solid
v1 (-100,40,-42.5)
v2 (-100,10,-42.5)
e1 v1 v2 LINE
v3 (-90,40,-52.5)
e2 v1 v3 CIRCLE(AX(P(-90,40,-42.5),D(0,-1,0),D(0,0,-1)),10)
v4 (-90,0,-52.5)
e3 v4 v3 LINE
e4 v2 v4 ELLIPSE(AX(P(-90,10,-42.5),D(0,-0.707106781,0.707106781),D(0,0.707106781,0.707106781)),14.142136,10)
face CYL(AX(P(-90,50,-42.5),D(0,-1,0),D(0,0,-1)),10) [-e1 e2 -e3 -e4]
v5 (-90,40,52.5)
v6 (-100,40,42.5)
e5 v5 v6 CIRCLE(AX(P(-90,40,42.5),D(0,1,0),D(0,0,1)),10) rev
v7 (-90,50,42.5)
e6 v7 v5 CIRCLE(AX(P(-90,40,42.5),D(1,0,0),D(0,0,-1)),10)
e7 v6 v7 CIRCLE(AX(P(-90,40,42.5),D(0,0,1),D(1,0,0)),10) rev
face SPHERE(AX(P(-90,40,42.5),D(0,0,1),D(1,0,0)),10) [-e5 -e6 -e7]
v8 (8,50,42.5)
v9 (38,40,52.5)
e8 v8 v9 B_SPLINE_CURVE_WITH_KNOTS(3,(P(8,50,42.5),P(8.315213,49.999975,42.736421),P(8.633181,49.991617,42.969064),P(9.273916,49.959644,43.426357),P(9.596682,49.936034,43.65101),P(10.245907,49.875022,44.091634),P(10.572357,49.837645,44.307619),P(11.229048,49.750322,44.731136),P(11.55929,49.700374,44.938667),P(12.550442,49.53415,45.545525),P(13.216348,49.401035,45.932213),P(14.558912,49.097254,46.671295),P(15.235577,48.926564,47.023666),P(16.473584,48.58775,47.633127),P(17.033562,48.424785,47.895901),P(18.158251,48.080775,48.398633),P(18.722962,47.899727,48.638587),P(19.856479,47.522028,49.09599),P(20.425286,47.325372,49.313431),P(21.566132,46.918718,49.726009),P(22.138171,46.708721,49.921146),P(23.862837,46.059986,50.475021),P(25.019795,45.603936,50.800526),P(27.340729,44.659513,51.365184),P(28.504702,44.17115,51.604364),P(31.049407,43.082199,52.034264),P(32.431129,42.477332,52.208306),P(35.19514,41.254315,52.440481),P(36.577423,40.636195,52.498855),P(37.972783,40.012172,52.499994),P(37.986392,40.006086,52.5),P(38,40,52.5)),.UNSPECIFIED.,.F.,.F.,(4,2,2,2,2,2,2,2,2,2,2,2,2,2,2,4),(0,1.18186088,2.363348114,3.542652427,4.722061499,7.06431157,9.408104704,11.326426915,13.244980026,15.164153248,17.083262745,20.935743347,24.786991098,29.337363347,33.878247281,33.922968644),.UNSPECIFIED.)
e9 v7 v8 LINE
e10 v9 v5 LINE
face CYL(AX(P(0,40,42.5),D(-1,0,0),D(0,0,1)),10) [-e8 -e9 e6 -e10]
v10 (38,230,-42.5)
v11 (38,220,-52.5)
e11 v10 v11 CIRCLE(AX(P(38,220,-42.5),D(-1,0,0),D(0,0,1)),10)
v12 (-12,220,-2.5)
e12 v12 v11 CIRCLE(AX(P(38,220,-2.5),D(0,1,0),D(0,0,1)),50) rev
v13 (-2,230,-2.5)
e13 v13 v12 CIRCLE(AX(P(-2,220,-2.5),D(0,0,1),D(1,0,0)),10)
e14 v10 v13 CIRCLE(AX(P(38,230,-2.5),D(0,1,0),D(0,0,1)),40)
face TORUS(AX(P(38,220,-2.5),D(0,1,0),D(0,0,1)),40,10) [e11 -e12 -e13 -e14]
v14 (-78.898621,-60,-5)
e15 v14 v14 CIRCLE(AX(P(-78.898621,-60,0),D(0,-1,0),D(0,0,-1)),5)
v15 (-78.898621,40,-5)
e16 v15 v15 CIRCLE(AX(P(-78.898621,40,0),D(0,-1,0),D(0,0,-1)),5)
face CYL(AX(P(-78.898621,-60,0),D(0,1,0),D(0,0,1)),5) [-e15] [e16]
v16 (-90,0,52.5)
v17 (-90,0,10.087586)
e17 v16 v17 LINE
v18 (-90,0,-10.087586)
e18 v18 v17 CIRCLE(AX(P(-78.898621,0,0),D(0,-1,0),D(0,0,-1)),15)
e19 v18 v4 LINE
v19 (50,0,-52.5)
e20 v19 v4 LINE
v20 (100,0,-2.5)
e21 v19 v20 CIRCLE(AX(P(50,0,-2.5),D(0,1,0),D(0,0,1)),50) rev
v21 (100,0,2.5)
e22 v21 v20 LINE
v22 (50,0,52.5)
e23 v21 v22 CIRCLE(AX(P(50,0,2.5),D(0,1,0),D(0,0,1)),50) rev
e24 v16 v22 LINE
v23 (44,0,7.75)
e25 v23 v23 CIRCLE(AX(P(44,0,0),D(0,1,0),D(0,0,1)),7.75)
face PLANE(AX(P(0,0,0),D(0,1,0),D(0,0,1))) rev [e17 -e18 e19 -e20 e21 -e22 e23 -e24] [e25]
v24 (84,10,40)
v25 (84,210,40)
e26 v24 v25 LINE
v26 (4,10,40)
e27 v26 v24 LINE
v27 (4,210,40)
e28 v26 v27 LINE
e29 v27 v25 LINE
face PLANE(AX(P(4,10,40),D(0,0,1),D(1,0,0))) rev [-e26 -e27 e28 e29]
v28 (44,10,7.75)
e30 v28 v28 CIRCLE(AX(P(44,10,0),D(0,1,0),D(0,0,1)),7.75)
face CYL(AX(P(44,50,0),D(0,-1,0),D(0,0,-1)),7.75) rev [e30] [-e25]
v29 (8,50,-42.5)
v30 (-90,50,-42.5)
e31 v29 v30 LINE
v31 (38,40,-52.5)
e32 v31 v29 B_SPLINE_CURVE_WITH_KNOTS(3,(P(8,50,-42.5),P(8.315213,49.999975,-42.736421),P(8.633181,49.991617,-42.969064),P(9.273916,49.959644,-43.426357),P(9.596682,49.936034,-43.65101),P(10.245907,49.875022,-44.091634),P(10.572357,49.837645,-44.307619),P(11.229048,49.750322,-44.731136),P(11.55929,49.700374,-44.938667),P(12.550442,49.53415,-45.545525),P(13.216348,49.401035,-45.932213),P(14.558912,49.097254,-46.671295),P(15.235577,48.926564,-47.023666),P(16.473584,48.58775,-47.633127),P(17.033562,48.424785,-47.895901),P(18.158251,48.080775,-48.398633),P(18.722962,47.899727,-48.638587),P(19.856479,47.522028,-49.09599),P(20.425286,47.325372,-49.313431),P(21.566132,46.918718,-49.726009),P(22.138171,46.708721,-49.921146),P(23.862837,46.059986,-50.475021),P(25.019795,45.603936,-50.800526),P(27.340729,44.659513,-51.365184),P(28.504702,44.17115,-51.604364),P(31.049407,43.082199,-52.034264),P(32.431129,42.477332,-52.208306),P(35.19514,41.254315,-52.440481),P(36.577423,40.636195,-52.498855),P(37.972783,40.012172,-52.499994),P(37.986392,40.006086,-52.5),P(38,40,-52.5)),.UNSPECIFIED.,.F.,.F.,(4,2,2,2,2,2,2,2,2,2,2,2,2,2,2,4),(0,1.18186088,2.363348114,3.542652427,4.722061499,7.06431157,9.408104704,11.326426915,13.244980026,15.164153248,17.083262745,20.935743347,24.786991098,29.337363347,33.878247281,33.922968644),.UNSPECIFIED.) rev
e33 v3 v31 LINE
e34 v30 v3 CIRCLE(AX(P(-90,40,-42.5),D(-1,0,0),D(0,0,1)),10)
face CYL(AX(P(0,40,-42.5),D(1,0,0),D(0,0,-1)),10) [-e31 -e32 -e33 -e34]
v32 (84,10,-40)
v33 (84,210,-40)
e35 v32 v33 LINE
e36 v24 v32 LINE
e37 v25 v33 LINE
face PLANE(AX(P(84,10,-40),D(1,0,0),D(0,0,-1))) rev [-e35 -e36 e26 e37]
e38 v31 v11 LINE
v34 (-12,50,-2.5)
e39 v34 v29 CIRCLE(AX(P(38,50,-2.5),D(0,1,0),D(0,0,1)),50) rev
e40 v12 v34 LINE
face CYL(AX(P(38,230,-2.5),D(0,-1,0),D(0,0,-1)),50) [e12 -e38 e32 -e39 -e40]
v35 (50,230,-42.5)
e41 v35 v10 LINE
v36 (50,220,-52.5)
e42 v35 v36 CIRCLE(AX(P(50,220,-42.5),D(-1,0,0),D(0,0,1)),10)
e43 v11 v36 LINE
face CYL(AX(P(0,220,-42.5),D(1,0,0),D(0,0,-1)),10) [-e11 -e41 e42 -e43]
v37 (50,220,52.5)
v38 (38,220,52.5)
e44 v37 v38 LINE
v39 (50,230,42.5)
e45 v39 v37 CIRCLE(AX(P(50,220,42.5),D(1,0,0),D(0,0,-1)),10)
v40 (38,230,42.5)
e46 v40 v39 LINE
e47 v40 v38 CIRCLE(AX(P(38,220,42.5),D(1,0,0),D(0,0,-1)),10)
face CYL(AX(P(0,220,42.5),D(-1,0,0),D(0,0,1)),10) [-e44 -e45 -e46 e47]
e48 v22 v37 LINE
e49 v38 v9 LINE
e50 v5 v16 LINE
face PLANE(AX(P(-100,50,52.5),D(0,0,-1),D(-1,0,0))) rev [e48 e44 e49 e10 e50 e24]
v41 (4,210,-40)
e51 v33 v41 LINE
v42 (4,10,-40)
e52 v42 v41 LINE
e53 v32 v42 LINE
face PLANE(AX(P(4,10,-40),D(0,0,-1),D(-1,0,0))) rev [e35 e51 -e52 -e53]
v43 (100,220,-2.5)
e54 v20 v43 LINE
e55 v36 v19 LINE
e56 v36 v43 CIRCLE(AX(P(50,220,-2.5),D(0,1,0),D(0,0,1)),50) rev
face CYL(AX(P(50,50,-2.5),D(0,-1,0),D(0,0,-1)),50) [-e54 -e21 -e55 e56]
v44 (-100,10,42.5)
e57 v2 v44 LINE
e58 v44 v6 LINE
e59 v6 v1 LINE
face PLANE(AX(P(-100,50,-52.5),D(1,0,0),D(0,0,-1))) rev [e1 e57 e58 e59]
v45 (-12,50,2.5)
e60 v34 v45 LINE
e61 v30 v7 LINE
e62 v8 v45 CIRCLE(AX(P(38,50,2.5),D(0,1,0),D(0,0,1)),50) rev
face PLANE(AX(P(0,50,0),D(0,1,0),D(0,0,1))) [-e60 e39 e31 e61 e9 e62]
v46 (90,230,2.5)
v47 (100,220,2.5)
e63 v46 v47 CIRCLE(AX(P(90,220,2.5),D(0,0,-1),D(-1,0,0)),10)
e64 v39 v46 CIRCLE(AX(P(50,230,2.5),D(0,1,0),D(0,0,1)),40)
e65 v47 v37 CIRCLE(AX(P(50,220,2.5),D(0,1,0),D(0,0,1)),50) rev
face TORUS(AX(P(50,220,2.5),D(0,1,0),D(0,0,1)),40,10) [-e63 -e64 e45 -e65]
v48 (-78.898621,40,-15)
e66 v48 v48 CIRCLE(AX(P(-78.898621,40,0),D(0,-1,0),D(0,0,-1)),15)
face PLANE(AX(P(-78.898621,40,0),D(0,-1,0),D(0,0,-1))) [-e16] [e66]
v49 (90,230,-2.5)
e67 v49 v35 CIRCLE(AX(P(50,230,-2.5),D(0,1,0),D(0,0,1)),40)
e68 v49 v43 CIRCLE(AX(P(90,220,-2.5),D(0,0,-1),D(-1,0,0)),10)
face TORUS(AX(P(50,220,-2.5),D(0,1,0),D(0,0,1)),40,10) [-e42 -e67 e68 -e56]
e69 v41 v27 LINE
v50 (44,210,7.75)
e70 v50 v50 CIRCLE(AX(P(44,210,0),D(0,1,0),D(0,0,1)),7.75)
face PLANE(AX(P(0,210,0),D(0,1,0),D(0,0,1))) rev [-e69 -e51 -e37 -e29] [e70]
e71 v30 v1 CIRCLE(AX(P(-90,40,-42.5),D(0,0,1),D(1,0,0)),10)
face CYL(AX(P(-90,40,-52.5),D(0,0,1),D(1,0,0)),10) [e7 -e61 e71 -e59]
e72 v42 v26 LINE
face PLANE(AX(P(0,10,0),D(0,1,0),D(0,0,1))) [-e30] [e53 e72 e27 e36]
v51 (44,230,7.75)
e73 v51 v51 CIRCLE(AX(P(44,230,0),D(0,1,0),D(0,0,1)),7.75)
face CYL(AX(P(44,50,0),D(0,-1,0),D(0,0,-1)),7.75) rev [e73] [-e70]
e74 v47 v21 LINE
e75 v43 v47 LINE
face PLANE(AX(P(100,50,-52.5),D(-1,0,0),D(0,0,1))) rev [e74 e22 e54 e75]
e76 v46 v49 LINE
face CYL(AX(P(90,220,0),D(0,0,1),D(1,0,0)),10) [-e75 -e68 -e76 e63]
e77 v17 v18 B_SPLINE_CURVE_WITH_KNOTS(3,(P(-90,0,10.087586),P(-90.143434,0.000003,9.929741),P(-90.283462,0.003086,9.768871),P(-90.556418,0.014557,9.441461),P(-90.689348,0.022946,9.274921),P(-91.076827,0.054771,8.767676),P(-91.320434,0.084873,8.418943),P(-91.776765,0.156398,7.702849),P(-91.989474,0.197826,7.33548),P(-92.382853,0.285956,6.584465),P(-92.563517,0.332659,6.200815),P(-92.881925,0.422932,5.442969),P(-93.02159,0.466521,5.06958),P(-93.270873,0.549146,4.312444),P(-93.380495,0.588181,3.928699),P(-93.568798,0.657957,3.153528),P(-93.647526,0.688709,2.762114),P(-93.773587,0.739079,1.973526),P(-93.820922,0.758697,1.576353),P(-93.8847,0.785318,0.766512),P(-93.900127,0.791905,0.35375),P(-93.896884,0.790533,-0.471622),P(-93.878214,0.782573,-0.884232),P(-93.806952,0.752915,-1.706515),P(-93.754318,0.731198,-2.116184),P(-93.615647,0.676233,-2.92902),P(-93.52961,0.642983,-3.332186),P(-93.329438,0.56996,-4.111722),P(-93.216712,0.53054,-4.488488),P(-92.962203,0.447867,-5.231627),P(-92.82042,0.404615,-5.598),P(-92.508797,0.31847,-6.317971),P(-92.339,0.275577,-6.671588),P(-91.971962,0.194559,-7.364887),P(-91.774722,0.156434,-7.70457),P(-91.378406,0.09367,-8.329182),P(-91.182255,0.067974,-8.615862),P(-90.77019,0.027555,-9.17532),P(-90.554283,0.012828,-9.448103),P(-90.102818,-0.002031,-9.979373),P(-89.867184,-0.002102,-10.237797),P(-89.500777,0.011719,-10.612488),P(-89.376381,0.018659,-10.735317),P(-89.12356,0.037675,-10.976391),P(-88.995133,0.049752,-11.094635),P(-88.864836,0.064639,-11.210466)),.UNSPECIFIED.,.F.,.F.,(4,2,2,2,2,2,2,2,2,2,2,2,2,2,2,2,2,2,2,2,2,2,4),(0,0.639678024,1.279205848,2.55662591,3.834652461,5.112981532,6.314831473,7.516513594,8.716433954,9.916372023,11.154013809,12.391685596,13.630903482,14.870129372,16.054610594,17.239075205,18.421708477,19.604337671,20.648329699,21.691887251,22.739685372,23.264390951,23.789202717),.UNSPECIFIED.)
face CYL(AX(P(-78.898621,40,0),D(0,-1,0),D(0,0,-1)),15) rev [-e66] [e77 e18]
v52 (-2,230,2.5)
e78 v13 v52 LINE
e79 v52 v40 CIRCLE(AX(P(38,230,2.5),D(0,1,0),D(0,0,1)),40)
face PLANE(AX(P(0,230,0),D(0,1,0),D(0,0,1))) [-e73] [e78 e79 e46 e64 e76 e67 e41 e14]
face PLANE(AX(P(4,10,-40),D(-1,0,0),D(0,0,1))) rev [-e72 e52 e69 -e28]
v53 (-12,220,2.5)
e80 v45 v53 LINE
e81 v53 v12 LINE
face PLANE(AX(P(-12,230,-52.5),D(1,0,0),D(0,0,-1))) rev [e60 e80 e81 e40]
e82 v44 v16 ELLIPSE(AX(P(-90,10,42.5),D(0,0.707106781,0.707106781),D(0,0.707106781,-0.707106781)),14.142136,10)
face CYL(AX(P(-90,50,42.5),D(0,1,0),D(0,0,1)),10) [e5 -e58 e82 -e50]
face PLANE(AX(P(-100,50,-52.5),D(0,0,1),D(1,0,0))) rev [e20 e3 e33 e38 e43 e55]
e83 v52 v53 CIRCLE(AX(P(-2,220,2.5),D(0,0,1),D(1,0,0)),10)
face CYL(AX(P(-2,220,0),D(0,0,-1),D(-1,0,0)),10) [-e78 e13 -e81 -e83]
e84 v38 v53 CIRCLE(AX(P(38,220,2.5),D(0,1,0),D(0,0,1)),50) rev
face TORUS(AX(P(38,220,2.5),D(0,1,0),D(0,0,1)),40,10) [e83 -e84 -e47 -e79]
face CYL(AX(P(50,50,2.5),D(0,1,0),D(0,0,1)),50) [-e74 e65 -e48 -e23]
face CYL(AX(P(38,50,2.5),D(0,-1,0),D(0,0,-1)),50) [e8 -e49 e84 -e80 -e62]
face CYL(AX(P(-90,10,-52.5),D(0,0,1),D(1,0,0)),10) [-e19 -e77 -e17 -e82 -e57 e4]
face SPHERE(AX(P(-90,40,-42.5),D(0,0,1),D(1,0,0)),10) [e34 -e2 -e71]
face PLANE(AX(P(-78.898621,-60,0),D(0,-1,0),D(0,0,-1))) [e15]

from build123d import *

# Parameters (mm, degrees)
SKETCH2_W               = 200
SKETCH2_H               = 105
SKETCH2_R               = 7.75
BOSS_EXTRUDE2_DEPTH     = 50
SKETCH3_R               = 15
CUT_EXTRUDE1_DEPTH      = 40
SKETCH4_R               = 5
BOSS_EXTRUDE3_DEPTH     = 100
SKETCH5_W               = 112
SKETCH5_H               = 105
BOSS_EXTRUDE4_DEPTH     = 180
SKETCH7_R               = 7.75
CUT_EXTRUDE2_DEPTH      = 200
CUT_EXTRUDE3_DEPTH      = 160
CUT_EXTRUDE3_DEPTH_BACK = 40
SKETCH8_W               = 80
SKETCH8_H               = 80
FILLET6_R               = 10
FILLET7_R               = 10
FILLET8_R               = 10
FILLET9_R               = 50
FILLET10_R              = 50
FILLET11_R              = 50
FILLET12_R              = 50
FILLET14_R              = 10


with BuildPart() as part:
    # Sketch2 → Boss-Extrude2 (new body)
    with BuildSketch(Plane(origin=(0, 0, 0), x_dir=(1, 0, 0), z_dir=(0, 1, 0))):
        Rectangle(SKETCH2_W, SKETCH2_H)
        with Locations(Location((44, 0, 0), (0, 0, 270))):
            Circle(SKETCH2_R, mode=Mode.SUBTRACT)
    extrude(amount=BOSS_EXTRUDE2_DEPTH)

    # Sketch3 → Cut-Extrude1 (cut)
    with BuildSketch(Plane.XZ):
        with Locations(Location((-78.898621146, 0, 0), (0, 0, 270))):
            Circle(SKETCH3_R)
    extrude(amount=-CUT_EXTRUDE1_DEPTH, mode=Mode.SUBTRACT)

    # Sketch4 → Boss-Extrude3 (add)
    with BuildSketch(Plane.XZ.offset(-40)):
        with Locations(Location((-78.898621146, 0, 0), (0, 0, 270))):
            Circle(SKETCH4_R)
    extrude(amount=BOSS_EXTRUDE3_DEPTH)

    # Sketch5 → Boss-Extrude4 (add)
    with BuildSketch(Plane(origin=(0, 50, 0), x_dir=(1, 0, 0), z_dir=(0, 1, 0))):
        with Locations((44, 0)):
            Rectangle(SKETCH5_W, SKETCH5_H)
    extrude(amount=BOSS_EXTRUDE4_DEPTH)

    # Sketch7 → Cut-Extrude2 (cut)
    with BuildSketch(Plane.XZ.offset(-50)):
        with Locations(Location((44, 0, 0), (0, 0, 90))):
            Circle(SKETCH7_R)
    extrude(amount=-CUT_EXTRUDE2_DEPTH, mode=Mode.SUBTRACT)

    # Sketch8 → Cut-Extrude3 (cut, two sides: drawn at the far end of the back side and taken through both)
    with BuildSketch(Plane(origin=(0, 50, 0), x_dir=(1, 0, 0), z_dir=(0, 1, 0)).offset(-CUT_EXTRUDE3_DEPTH_BACK)):
        with Locations((44, 0)):
            Rectangle(SKETCH8_W, SKETCH8_H)
    extrude(amount=CUT_EXTRUDE3_DEPTH + CUT_EXTRUDE3_DEPTH_BACK, mode=Mode.SUBTRACT)

    # Fillet6
    # the kernel refuses this fillet: 10 mm, written as the material it takes off along each edge
    with BuildSketch(Plane(origin=(-100, 50, 77.5), x_dir=(0, -1, 0), z_dir=(0, 0, -1))) as fillet6_piece_1:
        with BuildLine():
            CenterArc((FILLET6_R, -FILLET6_R), FILLET6_R, 90, 90)
            Line((0, -FILLET6_R), (0, 0))
            Line((0, 0), (FILLET6_R, 0))
        make_face()
    extrude(amount=155, mode=Mode.SUBTRACT)
    with BuildSketch(Plane(origin=(-100, 0, 77.5), x_dir=(0, 1, 0), z_dir=(0, 0, -1))) as fillet6_piece_2:
        with BuildLine():
            CenterArc((FILLET6_R, FILLET6_R), FILLET6_R, 180, 90)
            Line((0, FILLET6_R), (0, 0))
            Line((0, 0), (FILLET6_R, 0))
        make_face()
    extrude(amount=155, mode=Mode.SUBTRACT)
    with BuildSketch(Plane(origin=(-100, -25, 52.5), x_dir=(0, 0, -1), z_dir=(0, 1, 0)), Plane(origin=(-100, -25, -52.5), x_dir=(1, 0, 0), z_dir=(0, 1, 0))) as fillet6_piece_3:
        with BuildLine():
            CenterArc((FILLET6_R, -FILLET6_R), FILLET6_R, 90, 90)
            Line((0, -FILLET6_R), (0, 0))
            Line((0, 0), (FILLET6_R, 0))
        make_face()
    extrude(amount=100, mode=Mode.SUBTRACT)

    # Fillet7
    # the kernel refuses this fillet: 10 mm, written as the material it takes off along each edge
    with BuildSketch(Plane(origin=(-90, 40, 42.5), x_dir=(0, 0, 1), z_dir=(0, 1, 0))) as fillet7_piece_1_section:
        Polygon((0, 0), (FILLET7_R, 0), (FILLET7_R, -FILLET7_R), (0, -FILLET7_R), align=None)
    fillet7_piece_1 = extrude(amount=FILLET7_R, mode=Mode.PRIVATE)
    fillet7_piece_1 = fillet7_piece_1 - Plane(origin=(-90, 40, 42.5), x_dir=(0.7071067811865477, 0, -0.7071067811865475), z_dir=(0, 1, 0)) * Sphere(FILLET7_R, mode=Mode.PRIVATE)
    add(fillet7_piece_1, mode=Mode.SUBTRACT)
    with BuildSketch(Plane(origin=(-12, 50, 52.5), x_dir=(0, 0, -1), z_dir=(-1, 0, 0))) as fillet7_piece_2:
        with BuildLine():
            CenterArc((FILLET7_R, FILLET7_R), FILLET7_R, 180, 90)
            Line((0, FILLET7_R), (0, 0))
            Line((0, 0), (FILLET7_R, 0))
        make_face()
    extrude(amount=78, mode=Mode.SUBTRACT)

    # Fillet8
    # the kernel refuses this fillet: 10 mm, written as the material it takes off along each edge
    with BuildSketch(Plane(origin=(-90, 40, -42.5), x_dir=(0, 1, 0), z_dir=(0, 0, -1))) as fillet8_piece_1_section:
        Polygon((0, 0), (FILLET8_R, 0), (FILLET8_R, -FILLET8_R), (0, -FILLET8_R), align=None)
    fillet8_piece_1 = extrude(amount=FILLET8_R, mode=Mode.PRIVATE)
    fillet8_piece_1 = fillet8_piece_1 - Plane(origin=(-90, 40, -42.5), x_dir=(0.7071067811865475, -0.7071067811865475, 0), z_dir=(0, 0, -1)) * Sphere(FILLET8_R, mode=Mode.PRIVATE)
    add(fillet8_piece_1, mode=Mode.SUBTRACT)
    with BuildSketch(Plane(origin=(-90, 50, -52.5), x_dir=(0, -1, 0), z_dir=(1, 0, 0))) as fillet8_piece_2:
        with BuildLine():
            CenterArc((FILLET8_R, -FILLET8_R), FILLET8_R, 90, 90)
            Line((0, -FILLET8_R), (0, 0))
            Line((0, 0), (FILLET8_R, 0))
        make_face()
    extrude(amount=78, mode=Mode.SUBTRACT)

    # Fillet9
    fillet9_edges = [part.edges().sort_by_distance(p)[0] for p in [
        (100, 115, 52.5),
    ]]
    fillet(fillet9_edges, radius=FILLET9_R)

    # Fillet10
    fillet10_edges = [part.edges().sort_by_distance(p)[0] for p in [
        (-12, 135, 52.5),
    ]]
    fillet(fillet10_edges, radius=FILLET10_R)

    # Fillet11
    fillet11_edges = [part.edges().sort_by_distance(p)[0] for p in [
        (100, 115, -52.5),
    ]]
    fillet(fillet11_edges, radius=FILLET11_R)

    # Fillet12
    fillet12_edges = [part.edges().sort_by_distance(p)[0] for p in [
        (-12, 135, -52.5),
    ]]
    fillet(fillet12_edges, radius=FILLET12_R)

    # Fillet14
    fillet14_edges = [part.edges().sort_by_distance(p)[0] for p in [
        (100, 230, 0),
        (85.355339059, 230, 37.855339059),
        (44, 230, 52.5),
        (2.644660941, 230, 37.855339059),
        (44, 230, -52.5),
        (85.355339059, 230, -37.855339059),
        (-12, 230, 0),
        (2.644660941, 230, -37.855339059),
    ]]
    fillet(fillet14_edges, radius=FILLET14_R)


solid = part.part
